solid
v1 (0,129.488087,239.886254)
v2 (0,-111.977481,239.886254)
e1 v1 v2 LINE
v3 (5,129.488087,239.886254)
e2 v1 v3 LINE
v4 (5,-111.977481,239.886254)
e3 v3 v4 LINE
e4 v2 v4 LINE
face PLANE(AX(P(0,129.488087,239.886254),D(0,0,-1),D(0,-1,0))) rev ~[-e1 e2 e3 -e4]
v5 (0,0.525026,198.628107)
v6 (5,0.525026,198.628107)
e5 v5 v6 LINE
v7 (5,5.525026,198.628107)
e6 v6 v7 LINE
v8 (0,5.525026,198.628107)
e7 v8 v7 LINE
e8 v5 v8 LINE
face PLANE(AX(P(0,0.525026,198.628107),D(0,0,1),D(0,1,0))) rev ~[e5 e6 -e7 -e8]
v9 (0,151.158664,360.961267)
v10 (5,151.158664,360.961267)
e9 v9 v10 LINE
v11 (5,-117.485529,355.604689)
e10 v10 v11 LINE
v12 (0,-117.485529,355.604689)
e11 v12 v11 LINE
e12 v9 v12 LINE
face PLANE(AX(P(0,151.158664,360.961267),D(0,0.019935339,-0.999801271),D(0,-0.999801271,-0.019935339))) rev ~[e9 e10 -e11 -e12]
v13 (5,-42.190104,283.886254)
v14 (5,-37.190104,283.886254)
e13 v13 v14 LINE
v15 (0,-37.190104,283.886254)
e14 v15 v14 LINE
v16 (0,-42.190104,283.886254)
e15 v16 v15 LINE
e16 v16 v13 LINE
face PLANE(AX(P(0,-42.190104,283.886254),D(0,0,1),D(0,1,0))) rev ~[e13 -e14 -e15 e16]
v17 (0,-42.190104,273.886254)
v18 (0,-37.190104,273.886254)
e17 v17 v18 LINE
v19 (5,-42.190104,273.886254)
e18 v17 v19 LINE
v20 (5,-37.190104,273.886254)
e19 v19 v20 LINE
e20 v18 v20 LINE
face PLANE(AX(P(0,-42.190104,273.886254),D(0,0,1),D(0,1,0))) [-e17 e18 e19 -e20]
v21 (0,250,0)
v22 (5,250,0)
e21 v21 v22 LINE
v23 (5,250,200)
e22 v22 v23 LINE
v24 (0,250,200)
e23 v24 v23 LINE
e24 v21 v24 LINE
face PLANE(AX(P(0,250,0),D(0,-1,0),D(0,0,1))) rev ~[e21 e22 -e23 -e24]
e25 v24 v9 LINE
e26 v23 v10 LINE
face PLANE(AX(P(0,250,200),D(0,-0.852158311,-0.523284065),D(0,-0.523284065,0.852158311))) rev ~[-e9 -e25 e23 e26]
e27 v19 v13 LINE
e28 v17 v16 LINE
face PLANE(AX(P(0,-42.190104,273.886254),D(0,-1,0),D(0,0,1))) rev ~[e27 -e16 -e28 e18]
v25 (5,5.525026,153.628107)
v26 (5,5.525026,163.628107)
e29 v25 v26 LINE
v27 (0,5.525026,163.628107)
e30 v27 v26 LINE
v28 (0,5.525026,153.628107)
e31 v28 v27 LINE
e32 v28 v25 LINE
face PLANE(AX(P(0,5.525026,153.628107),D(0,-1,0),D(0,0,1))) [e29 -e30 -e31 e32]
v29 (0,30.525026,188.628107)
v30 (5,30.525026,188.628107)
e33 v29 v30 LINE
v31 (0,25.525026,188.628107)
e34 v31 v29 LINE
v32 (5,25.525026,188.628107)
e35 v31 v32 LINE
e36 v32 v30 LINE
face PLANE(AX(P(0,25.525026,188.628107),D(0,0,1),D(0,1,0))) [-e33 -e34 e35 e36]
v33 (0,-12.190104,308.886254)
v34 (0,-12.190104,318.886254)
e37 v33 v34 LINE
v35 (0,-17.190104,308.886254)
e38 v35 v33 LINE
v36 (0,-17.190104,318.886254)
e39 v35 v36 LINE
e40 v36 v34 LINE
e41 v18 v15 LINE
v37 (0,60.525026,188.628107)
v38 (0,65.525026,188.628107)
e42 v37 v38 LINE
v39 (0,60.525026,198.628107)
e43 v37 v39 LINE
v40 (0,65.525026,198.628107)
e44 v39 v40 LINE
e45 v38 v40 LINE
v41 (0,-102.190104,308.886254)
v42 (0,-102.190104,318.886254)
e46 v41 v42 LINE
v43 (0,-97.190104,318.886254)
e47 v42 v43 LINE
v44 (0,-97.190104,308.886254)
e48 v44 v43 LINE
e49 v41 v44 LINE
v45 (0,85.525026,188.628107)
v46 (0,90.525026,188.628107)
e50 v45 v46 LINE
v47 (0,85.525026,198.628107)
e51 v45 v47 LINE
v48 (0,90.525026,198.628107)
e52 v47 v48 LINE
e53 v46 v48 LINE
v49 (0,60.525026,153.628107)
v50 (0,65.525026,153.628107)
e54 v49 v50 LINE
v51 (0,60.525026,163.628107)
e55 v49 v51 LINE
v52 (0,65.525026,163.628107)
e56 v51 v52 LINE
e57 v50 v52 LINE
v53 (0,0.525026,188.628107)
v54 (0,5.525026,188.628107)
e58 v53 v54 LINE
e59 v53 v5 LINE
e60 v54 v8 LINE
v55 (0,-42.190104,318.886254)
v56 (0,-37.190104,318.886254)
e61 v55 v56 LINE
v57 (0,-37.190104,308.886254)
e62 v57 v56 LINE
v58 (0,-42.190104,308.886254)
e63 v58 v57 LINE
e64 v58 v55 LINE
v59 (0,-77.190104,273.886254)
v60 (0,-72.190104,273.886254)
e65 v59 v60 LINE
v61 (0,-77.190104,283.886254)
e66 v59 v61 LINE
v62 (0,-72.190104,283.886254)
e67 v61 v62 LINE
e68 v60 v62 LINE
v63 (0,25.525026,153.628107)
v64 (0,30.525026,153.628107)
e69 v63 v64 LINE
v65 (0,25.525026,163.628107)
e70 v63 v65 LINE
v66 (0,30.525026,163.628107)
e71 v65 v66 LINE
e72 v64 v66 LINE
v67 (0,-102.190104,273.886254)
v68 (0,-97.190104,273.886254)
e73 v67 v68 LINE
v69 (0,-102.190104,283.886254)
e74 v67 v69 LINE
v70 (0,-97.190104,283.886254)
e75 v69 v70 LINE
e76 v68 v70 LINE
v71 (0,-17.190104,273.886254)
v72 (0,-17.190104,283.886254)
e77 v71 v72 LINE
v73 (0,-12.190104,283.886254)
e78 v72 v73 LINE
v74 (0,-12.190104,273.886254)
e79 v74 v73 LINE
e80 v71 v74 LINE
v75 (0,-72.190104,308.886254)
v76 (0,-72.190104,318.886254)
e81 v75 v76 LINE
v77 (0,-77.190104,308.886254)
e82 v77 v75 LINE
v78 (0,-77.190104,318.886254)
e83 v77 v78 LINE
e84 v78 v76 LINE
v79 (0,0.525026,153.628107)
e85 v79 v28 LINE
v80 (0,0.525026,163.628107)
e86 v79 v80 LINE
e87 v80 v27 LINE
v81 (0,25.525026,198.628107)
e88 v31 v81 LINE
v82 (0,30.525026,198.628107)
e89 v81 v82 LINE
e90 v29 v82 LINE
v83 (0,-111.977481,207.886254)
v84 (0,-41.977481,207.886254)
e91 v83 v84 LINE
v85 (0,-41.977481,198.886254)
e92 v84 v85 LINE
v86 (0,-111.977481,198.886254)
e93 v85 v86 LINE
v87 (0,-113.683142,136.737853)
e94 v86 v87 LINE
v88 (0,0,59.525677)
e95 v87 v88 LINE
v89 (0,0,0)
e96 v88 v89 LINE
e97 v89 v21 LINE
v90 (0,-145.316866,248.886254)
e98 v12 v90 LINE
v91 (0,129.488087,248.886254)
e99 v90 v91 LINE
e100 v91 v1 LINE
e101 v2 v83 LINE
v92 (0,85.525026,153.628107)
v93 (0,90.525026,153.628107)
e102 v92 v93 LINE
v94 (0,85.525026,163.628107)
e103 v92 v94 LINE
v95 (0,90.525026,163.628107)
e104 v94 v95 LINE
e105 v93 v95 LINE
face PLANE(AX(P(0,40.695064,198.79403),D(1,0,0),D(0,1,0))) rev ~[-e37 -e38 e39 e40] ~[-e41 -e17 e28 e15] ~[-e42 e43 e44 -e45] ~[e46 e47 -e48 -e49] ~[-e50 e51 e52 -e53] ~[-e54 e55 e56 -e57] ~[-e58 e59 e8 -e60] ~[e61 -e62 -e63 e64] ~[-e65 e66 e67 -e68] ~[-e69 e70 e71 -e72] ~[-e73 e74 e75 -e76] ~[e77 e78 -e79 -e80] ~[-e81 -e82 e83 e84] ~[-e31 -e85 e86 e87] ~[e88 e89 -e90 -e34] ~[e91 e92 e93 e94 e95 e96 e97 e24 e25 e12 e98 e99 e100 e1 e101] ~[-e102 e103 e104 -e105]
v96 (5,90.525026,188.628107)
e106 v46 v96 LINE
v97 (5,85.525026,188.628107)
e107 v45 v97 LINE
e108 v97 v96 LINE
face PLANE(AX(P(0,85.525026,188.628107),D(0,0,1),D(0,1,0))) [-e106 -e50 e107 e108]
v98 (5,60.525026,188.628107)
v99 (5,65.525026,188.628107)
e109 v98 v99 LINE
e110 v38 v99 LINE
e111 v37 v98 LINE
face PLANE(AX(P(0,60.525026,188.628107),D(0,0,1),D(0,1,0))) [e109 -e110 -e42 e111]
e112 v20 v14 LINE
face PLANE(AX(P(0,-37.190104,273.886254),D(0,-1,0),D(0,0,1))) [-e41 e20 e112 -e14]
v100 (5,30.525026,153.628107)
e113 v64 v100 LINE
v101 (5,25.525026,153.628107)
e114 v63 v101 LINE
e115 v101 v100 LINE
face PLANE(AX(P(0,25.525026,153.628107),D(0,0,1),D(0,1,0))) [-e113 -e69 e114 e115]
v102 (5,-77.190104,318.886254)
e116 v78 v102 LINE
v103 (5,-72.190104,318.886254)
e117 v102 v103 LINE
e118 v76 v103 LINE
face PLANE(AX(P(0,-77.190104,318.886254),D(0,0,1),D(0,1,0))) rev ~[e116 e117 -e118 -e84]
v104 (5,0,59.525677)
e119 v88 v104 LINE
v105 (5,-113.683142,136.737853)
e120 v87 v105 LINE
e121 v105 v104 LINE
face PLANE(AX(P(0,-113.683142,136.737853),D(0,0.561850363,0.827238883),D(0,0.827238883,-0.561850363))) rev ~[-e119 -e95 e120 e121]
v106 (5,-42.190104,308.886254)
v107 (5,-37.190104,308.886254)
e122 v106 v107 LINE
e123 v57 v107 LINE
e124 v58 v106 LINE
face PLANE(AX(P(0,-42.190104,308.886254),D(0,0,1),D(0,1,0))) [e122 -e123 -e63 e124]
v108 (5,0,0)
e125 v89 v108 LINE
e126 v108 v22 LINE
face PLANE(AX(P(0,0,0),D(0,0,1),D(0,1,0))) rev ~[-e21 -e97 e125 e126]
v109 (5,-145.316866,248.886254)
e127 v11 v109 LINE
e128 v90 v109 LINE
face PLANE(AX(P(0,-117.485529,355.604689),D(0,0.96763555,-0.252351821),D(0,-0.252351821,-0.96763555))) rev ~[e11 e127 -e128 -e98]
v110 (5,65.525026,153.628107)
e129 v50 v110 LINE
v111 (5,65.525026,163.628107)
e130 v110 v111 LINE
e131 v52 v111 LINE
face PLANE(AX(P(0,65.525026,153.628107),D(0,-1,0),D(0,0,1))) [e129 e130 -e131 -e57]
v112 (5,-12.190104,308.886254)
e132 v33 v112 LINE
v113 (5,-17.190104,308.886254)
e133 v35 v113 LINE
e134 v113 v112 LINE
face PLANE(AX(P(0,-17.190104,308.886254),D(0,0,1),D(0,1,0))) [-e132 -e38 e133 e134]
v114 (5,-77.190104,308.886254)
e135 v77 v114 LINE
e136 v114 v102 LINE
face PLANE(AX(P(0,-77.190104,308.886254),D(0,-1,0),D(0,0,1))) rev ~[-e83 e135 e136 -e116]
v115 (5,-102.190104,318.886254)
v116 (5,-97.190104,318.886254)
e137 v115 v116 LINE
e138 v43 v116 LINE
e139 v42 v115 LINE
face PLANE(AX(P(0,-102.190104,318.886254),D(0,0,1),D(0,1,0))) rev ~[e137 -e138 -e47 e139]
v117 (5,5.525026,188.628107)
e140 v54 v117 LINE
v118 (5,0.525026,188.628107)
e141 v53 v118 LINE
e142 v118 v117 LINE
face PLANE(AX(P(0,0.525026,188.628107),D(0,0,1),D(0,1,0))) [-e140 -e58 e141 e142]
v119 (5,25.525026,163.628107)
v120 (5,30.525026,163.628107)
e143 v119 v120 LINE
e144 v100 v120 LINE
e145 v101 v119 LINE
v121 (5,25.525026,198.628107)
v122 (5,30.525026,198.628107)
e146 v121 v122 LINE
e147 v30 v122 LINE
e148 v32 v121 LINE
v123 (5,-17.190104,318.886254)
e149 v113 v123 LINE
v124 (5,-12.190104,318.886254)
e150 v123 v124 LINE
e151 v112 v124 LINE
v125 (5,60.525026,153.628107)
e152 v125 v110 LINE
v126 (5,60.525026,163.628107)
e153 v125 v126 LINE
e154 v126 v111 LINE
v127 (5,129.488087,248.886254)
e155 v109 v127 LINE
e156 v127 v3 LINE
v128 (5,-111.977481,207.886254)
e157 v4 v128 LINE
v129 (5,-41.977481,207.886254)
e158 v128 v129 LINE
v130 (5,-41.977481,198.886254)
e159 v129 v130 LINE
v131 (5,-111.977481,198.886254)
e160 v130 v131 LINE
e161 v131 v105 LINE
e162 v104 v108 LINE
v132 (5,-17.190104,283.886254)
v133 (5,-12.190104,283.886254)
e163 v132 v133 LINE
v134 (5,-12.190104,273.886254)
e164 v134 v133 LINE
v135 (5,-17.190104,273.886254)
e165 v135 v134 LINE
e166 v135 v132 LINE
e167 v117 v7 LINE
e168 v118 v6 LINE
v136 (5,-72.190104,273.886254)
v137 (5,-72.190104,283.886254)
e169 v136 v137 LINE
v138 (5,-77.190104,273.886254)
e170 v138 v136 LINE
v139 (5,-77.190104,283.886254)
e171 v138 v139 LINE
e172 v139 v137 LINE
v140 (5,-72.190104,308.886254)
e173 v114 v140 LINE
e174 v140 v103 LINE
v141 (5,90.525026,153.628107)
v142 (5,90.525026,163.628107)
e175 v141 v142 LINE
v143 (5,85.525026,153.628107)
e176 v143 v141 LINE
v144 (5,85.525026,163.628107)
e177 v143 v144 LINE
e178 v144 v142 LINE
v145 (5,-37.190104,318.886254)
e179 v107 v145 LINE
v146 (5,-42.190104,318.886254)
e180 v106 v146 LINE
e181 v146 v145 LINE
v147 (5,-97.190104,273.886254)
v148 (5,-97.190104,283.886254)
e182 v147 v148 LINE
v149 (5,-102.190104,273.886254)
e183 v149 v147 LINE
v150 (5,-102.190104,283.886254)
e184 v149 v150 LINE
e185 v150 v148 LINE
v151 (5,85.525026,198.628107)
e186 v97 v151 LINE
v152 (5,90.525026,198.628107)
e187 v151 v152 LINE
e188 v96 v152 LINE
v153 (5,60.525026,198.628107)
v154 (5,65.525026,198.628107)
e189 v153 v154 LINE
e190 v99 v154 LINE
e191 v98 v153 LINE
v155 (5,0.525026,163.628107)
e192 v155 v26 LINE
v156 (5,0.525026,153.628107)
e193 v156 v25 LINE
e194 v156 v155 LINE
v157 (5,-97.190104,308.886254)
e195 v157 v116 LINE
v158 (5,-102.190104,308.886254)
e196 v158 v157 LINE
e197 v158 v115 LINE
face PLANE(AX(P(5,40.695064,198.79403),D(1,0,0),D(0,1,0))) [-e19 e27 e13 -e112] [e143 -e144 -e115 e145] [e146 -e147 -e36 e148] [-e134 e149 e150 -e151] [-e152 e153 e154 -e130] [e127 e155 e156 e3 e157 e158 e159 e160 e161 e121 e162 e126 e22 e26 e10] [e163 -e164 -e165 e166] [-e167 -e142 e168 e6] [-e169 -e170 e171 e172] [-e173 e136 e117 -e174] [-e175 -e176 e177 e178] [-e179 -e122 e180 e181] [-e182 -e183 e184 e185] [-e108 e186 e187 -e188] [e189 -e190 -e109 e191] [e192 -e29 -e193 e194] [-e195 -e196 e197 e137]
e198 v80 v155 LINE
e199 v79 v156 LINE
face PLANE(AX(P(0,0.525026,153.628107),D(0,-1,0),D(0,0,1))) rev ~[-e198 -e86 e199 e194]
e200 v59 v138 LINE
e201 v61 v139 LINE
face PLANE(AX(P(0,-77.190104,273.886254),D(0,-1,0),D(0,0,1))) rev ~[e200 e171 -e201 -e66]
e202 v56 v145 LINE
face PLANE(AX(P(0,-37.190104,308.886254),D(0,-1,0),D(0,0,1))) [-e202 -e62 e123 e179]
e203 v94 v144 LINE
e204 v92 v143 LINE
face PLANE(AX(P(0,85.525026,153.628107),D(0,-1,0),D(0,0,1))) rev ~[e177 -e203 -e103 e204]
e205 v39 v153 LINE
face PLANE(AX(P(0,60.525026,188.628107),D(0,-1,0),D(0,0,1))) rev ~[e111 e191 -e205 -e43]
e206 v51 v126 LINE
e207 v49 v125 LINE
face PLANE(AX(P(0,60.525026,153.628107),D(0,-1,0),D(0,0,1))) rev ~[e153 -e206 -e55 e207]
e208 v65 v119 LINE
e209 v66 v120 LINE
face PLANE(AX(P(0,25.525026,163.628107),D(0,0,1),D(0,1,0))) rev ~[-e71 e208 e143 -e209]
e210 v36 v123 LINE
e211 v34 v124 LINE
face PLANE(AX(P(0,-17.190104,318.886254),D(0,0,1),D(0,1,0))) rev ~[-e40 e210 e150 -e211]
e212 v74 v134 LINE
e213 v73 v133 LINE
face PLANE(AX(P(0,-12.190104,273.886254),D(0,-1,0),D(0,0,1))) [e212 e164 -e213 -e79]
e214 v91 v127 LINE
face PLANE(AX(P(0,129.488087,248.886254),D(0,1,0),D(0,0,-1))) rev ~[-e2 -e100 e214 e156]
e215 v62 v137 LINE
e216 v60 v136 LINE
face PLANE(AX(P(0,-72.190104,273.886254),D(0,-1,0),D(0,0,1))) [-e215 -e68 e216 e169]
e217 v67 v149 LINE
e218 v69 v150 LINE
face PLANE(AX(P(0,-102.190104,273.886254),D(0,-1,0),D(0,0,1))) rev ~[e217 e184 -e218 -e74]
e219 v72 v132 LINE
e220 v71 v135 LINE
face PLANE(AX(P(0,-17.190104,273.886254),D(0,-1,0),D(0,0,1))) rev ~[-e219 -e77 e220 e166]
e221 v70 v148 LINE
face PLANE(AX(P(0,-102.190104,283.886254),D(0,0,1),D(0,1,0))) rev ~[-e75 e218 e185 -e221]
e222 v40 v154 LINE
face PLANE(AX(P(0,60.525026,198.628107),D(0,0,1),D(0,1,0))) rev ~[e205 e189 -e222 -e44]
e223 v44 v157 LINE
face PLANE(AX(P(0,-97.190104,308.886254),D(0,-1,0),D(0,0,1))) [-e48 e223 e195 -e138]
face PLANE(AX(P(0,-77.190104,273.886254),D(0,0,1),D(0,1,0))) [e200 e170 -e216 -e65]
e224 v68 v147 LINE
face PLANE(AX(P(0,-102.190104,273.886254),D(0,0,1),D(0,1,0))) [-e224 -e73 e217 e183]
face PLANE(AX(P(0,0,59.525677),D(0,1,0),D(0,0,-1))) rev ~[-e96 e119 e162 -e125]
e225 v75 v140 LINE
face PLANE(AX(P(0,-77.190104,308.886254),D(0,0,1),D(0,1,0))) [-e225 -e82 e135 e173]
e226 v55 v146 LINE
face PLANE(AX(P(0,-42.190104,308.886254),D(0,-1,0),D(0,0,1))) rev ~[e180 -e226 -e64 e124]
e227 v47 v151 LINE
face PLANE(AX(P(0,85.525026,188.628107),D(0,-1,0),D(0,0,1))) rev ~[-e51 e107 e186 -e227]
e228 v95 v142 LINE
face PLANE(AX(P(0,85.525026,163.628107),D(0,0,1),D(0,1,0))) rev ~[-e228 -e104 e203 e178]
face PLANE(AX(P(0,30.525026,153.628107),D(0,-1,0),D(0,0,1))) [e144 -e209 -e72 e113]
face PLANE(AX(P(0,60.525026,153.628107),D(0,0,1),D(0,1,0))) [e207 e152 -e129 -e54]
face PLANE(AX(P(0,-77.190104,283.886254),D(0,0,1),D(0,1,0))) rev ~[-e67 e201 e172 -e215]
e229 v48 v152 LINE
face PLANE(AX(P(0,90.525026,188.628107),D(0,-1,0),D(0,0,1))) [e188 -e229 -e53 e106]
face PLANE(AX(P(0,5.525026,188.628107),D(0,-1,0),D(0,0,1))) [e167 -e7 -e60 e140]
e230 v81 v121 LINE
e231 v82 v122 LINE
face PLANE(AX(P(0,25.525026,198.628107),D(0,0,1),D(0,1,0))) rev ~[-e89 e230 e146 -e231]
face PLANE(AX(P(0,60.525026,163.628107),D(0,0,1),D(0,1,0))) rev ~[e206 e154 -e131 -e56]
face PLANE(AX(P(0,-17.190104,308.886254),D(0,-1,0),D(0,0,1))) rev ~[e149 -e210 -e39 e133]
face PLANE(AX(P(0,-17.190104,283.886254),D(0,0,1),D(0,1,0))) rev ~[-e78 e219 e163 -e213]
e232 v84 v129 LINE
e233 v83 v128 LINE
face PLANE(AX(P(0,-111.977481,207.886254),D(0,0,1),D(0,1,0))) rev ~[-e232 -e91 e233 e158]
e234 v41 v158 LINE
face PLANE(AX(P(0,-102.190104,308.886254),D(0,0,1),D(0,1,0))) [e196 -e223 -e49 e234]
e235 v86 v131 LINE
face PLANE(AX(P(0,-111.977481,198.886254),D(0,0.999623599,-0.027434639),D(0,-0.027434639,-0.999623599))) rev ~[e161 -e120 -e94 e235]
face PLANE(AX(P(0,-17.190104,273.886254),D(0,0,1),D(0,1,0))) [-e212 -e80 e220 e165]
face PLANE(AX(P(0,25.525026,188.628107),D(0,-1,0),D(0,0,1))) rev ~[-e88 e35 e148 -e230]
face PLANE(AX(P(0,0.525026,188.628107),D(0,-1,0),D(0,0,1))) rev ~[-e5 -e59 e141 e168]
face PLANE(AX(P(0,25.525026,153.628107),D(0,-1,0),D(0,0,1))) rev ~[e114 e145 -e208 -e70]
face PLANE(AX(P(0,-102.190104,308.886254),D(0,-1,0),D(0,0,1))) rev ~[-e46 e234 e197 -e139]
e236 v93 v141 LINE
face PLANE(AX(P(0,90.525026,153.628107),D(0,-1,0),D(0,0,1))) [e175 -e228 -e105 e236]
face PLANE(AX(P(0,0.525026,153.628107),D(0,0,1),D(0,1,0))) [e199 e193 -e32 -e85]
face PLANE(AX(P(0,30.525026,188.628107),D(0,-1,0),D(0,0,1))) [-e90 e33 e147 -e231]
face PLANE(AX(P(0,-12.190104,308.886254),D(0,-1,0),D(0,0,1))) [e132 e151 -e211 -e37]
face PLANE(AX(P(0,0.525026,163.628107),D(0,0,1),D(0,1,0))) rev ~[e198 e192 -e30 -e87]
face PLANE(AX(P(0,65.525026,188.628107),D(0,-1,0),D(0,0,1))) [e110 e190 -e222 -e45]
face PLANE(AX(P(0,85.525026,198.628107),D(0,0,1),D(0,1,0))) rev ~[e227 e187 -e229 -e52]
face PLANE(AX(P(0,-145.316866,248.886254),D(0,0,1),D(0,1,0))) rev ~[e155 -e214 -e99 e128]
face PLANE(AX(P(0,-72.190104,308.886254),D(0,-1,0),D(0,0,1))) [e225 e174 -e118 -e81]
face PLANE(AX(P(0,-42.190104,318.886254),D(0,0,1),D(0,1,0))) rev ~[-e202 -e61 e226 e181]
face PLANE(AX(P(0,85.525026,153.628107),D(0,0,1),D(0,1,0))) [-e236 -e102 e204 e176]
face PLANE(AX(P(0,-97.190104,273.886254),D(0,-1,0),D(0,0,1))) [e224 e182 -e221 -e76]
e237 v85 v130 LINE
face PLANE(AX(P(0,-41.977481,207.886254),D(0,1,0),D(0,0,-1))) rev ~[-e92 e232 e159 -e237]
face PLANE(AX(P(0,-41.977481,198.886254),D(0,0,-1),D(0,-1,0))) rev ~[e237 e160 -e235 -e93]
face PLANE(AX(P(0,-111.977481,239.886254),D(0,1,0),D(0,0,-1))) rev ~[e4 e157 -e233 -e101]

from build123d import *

# Parameters (mm, degrees)
F0_W     = 5
F0_H     = 10
F1_DEPTH = 5


# Not quite as in the source:
# - a feature names something its author has since deleted; it is built from what else it names


with BuildPart() as f1:
    # F0 (on Right) → F1 (new body)
    with BuildSketch(Plane.YZ):
        Polygon((0, 59.5256769704), (0, 0), (250, 0), (250, 200), (151.1586640426, 360.9612668205), (-117.4855289776, 355.6046891351), (-145.3168663312, 248.8862540722), (129.4880870227, 248.8862540722), (129.4880870227, 239.8862540722), (-111.9774808093, 239.8862540722), (-111.9774808093, 207.8862540722), (-41.9774808093, 207.8862540722), (-41.9774808093, 198.8862540722), (-111.9774808093, 198.8862540722), (-113.683141768, 136.7378532887), align=None)
        with Locations((3.0250263214, 158.6281073093)):
            Rectangle(F0_W, F0_H, mode=Mode.SUBTRACT)
        with Locations((28.0250263214, 158.6281073093)):
            Rectangle(F0_W, F0_H, mode=Mode.SUBTRACT)
        with Locations((63.0250263214, 158.6281073093)):
            Rectangle(F0_W, F0_H, mode=Mode.SUBTRACT)
        with Locations((88.0250263214, 158.6281073093)):
            Rectangle(F0_W, F0_H, mode=Mode.SUBTRACT)
        with Locations((3.0250263214, 193.6281073093)):
            Rectangle(F0_W, F0_H, mode=Mode.SUBTRACT)
        with Locations((28.0250263214, 193.6281073093)):
            Rectangle(F0_W, F0_H, mode=Mode.SUBTRACT)
        with Locations((-99.690104425, 278.8862540722)):
            Rectangle(F0_W, F0_H, mode=Mode.SUBTRACT)
        with Locations((-99.690104425, 313.8862540722)):
            Rectangle(F0_W, F0_H, mode=Mode.SUBTRACT)
        with Locations((-74.690104425, 278.8862540722)):
            Rectangle(F0_W, F0_H, mode=Mode.SUBTRACT)
        with Locations((-74.690104425, 313.8862540722)):
            Rectangle(F0_W, F0_H, mode=Mode.SUBTRACT)
        with Locations((-39.690104425, 278.8862540722)):
            Rectangle(F0_W, F0_H, mode=Mode.SUBTRACT)
        with Locations((-14.690104425, 278.8862540722)):
            Rectangle(F0_W, F0_H, mode=Mode.SUBTRACT)
        with Locations((-39.690104425, 313.8862540722)):
            Rectangle(F0_W, F0_H, mode=Mode.SUBTRACT)
        with Locations((-14.690104425, 313.8862540722)):
            Rectangle(F0_W, F0_H, mode=Mode.SUBTRACT)
        with Locations((63.0250263214, 193.6281073093)):
            Rectangle(F0_W, F0_H, mode=Mode.SUBTRACT)
        with Locations((88.0250263214, 193.6281073093)):
            Rectangle(F0_W, F0_H, mode=Mode.SUBTRACT)
    extrude(amount=F1_DEPTH)


solid = f1.part
